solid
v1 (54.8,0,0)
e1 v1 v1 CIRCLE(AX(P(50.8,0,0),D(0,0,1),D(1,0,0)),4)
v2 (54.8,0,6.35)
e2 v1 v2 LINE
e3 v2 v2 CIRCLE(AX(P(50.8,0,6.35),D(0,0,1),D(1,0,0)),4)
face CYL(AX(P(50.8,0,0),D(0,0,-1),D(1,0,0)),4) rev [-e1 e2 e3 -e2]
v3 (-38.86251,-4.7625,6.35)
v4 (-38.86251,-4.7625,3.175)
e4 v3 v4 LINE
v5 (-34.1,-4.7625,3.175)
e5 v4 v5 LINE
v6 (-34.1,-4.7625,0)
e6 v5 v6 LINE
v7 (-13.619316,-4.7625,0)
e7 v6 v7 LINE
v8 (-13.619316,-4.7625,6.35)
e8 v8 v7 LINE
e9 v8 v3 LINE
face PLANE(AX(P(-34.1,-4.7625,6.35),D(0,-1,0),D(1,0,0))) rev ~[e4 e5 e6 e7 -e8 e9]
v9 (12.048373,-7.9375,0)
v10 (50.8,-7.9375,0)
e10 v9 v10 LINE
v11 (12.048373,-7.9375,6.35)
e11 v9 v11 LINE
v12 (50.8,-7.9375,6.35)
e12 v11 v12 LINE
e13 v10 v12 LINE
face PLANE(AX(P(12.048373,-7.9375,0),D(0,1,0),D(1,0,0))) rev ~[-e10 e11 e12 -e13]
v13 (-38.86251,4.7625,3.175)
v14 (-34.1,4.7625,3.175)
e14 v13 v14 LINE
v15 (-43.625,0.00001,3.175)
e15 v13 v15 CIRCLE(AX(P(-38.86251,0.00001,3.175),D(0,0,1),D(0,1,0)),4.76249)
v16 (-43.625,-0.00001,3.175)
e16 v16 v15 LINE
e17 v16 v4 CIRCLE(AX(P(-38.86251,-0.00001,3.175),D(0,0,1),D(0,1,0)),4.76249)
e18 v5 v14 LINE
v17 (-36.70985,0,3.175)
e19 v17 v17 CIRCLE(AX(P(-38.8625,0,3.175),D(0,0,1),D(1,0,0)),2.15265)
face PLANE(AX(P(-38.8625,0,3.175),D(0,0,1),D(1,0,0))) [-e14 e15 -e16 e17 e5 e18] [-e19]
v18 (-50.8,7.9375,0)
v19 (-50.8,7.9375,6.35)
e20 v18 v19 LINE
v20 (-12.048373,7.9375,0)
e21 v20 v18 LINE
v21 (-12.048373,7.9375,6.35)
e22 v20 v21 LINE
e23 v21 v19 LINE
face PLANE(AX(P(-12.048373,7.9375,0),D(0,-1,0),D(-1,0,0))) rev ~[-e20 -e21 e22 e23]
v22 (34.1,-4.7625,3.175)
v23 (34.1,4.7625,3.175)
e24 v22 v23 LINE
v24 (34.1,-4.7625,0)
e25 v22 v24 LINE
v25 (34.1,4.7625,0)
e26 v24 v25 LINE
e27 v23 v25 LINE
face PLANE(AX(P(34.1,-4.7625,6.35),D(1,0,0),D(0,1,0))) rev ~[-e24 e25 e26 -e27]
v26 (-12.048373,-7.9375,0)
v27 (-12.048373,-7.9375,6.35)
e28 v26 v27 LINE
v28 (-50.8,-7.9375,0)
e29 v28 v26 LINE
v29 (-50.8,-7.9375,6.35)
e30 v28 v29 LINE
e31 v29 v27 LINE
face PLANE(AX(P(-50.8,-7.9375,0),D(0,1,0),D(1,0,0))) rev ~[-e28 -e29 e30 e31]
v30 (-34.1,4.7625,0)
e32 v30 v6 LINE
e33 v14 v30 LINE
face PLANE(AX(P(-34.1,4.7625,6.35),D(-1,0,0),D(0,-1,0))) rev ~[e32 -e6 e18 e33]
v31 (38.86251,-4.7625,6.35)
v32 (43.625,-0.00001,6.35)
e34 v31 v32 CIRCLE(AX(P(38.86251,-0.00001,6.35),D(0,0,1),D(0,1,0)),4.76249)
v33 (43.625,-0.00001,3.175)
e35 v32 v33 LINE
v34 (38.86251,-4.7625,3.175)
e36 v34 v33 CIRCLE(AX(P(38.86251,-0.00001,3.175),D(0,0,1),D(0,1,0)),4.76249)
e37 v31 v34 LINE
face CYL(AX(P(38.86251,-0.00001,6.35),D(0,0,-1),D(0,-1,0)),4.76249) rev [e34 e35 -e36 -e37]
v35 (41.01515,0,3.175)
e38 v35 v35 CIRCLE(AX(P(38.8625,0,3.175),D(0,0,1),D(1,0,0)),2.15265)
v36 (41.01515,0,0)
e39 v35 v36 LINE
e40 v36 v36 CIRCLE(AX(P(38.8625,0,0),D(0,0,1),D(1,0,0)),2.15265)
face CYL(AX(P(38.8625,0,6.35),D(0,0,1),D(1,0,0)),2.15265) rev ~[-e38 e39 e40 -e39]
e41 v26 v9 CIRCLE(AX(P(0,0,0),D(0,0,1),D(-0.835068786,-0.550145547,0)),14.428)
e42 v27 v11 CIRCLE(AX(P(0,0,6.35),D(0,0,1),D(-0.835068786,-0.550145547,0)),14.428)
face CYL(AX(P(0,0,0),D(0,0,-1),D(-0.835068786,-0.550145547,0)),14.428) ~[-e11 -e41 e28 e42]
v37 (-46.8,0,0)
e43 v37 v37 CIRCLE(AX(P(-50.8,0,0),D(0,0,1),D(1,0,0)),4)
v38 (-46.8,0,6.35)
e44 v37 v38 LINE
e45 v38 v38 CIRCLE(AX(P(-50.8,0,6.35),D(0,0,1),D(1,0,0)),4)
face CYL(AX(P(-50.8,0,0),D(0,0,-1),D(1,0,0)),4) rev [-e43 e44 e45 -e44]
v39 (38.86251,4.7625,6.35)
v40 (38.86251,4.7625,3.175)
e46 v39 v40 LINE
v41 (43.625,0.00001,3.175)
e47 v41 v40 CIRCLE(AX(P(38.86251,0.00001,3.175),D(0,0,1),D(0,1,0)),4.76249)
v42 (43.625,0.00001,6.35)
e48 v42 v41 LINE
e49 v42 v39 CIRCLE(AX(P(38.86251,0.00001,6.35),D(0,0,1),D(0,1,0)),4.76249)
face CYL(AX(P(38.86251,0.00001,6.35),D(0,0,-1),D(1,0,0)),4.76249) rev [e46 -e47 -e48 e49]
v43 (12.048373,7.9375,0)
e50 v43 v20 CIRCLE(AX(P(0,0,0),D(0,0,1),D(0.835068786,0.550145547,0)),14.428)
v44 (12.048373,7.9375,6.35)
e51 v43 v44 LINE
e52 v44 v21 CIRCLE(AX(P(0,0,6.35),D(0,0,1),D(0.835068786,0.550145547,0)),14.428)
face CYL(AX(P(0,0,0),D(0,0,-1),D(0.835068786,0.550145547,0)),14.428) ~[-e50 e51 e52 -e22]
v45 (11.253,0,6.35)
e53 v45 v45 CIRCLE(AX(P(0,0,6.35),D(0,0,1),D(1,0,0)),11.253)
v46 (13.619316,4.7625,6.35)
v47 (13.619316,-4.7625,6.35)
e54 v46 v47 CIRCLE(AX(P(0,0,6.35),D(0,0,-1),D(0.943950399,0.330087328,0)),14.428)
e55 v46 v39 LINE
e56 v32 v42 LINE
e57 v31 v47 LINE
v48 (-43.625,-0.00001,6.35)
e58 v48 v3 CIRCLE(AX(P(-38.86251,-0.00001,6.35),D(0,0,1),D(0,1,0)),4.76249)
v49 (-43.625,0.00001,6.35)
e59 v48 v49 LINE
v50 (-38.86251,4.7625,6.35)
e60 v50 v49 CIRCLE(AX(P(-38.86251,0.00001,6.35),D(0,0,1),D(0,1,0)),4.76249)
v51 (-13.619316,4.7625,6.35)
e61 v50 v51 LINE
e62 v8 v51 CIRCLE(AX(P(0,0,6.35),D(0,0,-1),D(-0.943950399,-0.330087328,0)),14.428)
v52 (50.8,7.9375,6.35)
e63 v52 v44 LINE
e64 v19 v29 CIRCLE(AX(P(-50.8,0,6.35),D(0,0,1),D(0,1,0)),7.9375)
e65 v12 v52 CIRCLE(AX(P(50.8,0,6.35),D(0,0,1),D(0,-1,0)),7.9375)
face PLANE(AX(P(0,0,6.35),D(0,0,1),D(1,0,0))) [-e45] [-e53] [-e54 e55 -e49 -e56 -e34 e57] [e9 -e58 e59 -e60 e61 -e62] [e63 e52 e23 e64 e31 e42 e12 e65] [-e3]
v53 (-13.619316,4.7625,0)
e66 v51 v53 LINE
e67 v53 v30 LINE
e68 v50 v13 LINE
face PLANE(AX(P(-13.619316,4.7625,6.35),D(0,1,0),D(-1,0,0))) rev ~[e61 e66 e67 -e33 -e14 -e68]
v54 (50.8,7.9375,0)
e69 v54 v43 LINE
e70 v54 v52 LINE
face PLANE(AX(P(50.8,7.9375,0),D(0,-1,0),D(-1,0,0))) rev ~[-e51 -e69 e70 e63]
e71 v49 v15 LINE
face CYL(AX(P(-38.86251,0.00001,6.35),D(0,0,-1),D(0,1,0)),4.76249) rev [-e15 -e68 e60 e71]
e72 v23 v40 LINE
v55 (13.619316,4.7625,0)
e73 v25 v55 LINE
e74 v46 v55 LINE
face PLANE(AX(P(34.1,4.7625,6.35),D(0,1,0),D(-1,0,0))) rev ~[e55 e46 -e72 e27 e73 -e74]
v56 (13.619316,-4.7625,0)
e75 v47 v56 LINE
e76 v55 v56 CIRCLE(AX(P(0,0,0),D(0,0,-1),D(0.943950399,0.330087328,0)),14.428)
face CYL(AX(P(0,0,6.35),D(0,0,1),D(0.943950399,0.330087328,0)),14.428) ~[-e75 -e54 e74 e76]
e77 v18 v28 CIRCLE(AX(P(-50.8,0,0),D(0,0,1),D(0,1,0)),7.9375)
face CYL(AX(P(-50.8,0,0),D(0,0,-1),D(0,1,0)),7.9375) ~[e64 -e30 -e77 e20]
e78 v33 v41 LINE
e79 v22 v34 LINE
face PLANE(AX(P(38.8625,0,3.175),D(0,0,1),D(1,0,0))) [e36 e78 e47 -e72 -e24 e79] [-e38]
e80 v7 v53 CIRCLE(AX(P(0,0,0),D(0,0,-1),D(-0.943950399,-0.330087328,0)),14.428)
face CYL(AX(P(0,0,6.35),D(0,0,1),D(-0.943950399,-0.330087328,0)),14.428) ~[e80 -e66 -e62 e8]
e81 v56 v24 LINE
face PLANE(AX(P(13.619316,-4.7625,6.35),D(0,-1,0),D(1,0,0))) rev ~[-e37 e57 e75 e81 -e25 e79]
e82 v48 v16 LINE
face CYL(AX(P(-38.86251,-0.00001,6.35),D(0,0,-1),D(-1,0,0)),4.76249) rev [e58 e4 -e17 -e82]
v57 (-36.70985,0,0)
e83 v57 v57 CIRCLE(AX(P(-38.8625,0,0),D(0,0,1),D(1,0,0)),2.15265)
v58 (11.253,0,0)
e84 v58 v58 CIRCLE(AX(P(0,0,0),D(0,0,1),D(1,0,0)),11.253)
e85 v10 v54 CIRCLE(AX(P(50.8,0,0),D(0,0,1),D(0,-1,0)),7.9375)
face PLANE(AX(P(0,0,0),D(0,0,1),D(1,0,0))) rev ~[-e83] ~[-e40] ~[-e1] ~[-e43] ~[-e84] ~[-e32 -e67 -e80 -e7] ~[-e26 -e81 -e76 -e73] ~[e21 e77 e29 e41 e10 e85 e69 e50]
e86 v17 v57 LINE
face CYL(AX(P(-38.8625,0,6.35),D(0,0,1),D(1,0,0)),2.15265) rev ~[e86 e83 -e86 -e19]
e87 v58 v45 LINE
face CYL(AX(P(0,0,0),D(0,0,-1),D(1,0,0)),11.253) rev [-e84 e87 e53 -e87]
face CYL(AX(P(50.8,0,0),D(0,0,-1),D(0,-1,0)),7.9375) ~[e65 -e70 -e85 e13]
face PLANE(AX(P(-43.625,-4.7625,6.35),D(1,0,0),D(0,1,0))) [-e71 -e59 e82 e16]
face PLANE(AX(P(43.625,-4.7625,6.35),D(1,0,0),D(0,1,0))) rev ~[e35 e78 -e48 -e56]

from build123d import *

# Parameters (mm, degrees)
F0_R     = 4
F0_R_2   = 11.2530001
F1_DEPTH = 6.35
F2_R     = 2.15265
F3_DEPTH = 6.35
F4_W     = 9.525
F4_H     = 9.525
F5_DEPTH = 3.175
F6_R     = 4.76249


# Not quite as in the source:
# - a fillet or chamfer is up to 0.001 mm smaller than in the source, because OpenCascade refuses the exact size


with BuildPart() as f1:
    # F0 (on Top) → F1 (new body)
    with BuildSketch(Plane.XY):
        with BuildLine():
            Line((-12.0483725306, 7.9375), (-50.8, 7.9375))
            ThreePointArc((-50.8, 7.9375), (-58.7375, 0), (-50.8, -7.9375))
            Line((-50.8, -7.9375), (-12.0483725306, -7.9375))
            ThreePointArc((-12.0483725306, -7.9375), (0, -14.4280001), (12.0483725306, -7.9375))
            Line((12.0483725306, -7.9375), (50.8, -7.9375))
            ThreePointArc((50.8, -7.9375), (58.7375, 0), (50.8, 7.9375))
            Line((50.8, 7.9375), (12.0483725306, 7.9375))
            ThreePointArc((12.0483725306, 7.9375), (0, 14.4280001), (-12.0483725306, 7.9375))
        make_face()
        with Locations((-50.8, 0)):
            Circle(F0_R, mode=Mode.SUBTRACT)
        Circle(F0_R_2, mode=Mode.SUBTRACT)
        with Locations((50.8, 0)):
            Circle(F0_R, mode=Mode.SUBTRACT)
    extrude(amount=F1_DEPTH)

    # F2 (on face) → F3 (cut, through all)
    with BuildSketch(Plane.XY.offset(6.35)):
        with BuildLine():
            ThreePointArc((-13.6193164526, -4.7625), (-14.4280001, 0), (-13.6193164526, 4.7625))
            Line((-13.6193164526, 4.7625), (-34.1, 4.7625))
            Line((-34.1, 4.7625), (-34.1, -4.7625))
            Line((-34.1, -4.7625), (-13.6193164526, -4.7625))
        make_face()
        with BuildLine():
            Line((34.1, 4.7625), (13.6193164526, 4.7625))
            ThreePointArc((13.6193164526, 4.7625), (14.4280001, 0), (13.6193164526, -4.7625))
            Line((13.6193164526, -4.7625), (34.1, -4.7625))
            Line((34.1, -4.7625), (34.1, 4.7625))
        make_face()
        with Locations((-38.8625, 0)):
            Circle(F2_R)
        with Locations((38.8625, 0)):
            Circle(F2_R)
    extrude(amount=-F3_DEPTH, mode=Mode.SUBTRACT)

    # F4 (on face) → F5 (cut)
    with BuildSketch(Plane.XY.offset(6.35)):
        with Locations((-38.8625, 0)):
            Rectangle(F4_W, F4_H)
        with Locations((38.8625, 0)):
            Rectangle(F4_W, F4_H)
    extrude(amount=-F5_DEPTH, mode=Mode.SUBTRACT)

    # F6 (radius 4.7625 in the source; OpenCascade refuses exactly that, so slightly less here)
    f6_edges = [f1.edges().sort_by_distance(p)[0] for p in [
        (-43.625, 4.7625, 4.7625),
        (-43.625, -4.7625, 4.7625),
        (43.625, 4.7625, 4.7625),
        (43.625, -4.7625, 4.7625),
    ]]
    fillet(f6_edges, radius=F6_R)


solid = f1.part
